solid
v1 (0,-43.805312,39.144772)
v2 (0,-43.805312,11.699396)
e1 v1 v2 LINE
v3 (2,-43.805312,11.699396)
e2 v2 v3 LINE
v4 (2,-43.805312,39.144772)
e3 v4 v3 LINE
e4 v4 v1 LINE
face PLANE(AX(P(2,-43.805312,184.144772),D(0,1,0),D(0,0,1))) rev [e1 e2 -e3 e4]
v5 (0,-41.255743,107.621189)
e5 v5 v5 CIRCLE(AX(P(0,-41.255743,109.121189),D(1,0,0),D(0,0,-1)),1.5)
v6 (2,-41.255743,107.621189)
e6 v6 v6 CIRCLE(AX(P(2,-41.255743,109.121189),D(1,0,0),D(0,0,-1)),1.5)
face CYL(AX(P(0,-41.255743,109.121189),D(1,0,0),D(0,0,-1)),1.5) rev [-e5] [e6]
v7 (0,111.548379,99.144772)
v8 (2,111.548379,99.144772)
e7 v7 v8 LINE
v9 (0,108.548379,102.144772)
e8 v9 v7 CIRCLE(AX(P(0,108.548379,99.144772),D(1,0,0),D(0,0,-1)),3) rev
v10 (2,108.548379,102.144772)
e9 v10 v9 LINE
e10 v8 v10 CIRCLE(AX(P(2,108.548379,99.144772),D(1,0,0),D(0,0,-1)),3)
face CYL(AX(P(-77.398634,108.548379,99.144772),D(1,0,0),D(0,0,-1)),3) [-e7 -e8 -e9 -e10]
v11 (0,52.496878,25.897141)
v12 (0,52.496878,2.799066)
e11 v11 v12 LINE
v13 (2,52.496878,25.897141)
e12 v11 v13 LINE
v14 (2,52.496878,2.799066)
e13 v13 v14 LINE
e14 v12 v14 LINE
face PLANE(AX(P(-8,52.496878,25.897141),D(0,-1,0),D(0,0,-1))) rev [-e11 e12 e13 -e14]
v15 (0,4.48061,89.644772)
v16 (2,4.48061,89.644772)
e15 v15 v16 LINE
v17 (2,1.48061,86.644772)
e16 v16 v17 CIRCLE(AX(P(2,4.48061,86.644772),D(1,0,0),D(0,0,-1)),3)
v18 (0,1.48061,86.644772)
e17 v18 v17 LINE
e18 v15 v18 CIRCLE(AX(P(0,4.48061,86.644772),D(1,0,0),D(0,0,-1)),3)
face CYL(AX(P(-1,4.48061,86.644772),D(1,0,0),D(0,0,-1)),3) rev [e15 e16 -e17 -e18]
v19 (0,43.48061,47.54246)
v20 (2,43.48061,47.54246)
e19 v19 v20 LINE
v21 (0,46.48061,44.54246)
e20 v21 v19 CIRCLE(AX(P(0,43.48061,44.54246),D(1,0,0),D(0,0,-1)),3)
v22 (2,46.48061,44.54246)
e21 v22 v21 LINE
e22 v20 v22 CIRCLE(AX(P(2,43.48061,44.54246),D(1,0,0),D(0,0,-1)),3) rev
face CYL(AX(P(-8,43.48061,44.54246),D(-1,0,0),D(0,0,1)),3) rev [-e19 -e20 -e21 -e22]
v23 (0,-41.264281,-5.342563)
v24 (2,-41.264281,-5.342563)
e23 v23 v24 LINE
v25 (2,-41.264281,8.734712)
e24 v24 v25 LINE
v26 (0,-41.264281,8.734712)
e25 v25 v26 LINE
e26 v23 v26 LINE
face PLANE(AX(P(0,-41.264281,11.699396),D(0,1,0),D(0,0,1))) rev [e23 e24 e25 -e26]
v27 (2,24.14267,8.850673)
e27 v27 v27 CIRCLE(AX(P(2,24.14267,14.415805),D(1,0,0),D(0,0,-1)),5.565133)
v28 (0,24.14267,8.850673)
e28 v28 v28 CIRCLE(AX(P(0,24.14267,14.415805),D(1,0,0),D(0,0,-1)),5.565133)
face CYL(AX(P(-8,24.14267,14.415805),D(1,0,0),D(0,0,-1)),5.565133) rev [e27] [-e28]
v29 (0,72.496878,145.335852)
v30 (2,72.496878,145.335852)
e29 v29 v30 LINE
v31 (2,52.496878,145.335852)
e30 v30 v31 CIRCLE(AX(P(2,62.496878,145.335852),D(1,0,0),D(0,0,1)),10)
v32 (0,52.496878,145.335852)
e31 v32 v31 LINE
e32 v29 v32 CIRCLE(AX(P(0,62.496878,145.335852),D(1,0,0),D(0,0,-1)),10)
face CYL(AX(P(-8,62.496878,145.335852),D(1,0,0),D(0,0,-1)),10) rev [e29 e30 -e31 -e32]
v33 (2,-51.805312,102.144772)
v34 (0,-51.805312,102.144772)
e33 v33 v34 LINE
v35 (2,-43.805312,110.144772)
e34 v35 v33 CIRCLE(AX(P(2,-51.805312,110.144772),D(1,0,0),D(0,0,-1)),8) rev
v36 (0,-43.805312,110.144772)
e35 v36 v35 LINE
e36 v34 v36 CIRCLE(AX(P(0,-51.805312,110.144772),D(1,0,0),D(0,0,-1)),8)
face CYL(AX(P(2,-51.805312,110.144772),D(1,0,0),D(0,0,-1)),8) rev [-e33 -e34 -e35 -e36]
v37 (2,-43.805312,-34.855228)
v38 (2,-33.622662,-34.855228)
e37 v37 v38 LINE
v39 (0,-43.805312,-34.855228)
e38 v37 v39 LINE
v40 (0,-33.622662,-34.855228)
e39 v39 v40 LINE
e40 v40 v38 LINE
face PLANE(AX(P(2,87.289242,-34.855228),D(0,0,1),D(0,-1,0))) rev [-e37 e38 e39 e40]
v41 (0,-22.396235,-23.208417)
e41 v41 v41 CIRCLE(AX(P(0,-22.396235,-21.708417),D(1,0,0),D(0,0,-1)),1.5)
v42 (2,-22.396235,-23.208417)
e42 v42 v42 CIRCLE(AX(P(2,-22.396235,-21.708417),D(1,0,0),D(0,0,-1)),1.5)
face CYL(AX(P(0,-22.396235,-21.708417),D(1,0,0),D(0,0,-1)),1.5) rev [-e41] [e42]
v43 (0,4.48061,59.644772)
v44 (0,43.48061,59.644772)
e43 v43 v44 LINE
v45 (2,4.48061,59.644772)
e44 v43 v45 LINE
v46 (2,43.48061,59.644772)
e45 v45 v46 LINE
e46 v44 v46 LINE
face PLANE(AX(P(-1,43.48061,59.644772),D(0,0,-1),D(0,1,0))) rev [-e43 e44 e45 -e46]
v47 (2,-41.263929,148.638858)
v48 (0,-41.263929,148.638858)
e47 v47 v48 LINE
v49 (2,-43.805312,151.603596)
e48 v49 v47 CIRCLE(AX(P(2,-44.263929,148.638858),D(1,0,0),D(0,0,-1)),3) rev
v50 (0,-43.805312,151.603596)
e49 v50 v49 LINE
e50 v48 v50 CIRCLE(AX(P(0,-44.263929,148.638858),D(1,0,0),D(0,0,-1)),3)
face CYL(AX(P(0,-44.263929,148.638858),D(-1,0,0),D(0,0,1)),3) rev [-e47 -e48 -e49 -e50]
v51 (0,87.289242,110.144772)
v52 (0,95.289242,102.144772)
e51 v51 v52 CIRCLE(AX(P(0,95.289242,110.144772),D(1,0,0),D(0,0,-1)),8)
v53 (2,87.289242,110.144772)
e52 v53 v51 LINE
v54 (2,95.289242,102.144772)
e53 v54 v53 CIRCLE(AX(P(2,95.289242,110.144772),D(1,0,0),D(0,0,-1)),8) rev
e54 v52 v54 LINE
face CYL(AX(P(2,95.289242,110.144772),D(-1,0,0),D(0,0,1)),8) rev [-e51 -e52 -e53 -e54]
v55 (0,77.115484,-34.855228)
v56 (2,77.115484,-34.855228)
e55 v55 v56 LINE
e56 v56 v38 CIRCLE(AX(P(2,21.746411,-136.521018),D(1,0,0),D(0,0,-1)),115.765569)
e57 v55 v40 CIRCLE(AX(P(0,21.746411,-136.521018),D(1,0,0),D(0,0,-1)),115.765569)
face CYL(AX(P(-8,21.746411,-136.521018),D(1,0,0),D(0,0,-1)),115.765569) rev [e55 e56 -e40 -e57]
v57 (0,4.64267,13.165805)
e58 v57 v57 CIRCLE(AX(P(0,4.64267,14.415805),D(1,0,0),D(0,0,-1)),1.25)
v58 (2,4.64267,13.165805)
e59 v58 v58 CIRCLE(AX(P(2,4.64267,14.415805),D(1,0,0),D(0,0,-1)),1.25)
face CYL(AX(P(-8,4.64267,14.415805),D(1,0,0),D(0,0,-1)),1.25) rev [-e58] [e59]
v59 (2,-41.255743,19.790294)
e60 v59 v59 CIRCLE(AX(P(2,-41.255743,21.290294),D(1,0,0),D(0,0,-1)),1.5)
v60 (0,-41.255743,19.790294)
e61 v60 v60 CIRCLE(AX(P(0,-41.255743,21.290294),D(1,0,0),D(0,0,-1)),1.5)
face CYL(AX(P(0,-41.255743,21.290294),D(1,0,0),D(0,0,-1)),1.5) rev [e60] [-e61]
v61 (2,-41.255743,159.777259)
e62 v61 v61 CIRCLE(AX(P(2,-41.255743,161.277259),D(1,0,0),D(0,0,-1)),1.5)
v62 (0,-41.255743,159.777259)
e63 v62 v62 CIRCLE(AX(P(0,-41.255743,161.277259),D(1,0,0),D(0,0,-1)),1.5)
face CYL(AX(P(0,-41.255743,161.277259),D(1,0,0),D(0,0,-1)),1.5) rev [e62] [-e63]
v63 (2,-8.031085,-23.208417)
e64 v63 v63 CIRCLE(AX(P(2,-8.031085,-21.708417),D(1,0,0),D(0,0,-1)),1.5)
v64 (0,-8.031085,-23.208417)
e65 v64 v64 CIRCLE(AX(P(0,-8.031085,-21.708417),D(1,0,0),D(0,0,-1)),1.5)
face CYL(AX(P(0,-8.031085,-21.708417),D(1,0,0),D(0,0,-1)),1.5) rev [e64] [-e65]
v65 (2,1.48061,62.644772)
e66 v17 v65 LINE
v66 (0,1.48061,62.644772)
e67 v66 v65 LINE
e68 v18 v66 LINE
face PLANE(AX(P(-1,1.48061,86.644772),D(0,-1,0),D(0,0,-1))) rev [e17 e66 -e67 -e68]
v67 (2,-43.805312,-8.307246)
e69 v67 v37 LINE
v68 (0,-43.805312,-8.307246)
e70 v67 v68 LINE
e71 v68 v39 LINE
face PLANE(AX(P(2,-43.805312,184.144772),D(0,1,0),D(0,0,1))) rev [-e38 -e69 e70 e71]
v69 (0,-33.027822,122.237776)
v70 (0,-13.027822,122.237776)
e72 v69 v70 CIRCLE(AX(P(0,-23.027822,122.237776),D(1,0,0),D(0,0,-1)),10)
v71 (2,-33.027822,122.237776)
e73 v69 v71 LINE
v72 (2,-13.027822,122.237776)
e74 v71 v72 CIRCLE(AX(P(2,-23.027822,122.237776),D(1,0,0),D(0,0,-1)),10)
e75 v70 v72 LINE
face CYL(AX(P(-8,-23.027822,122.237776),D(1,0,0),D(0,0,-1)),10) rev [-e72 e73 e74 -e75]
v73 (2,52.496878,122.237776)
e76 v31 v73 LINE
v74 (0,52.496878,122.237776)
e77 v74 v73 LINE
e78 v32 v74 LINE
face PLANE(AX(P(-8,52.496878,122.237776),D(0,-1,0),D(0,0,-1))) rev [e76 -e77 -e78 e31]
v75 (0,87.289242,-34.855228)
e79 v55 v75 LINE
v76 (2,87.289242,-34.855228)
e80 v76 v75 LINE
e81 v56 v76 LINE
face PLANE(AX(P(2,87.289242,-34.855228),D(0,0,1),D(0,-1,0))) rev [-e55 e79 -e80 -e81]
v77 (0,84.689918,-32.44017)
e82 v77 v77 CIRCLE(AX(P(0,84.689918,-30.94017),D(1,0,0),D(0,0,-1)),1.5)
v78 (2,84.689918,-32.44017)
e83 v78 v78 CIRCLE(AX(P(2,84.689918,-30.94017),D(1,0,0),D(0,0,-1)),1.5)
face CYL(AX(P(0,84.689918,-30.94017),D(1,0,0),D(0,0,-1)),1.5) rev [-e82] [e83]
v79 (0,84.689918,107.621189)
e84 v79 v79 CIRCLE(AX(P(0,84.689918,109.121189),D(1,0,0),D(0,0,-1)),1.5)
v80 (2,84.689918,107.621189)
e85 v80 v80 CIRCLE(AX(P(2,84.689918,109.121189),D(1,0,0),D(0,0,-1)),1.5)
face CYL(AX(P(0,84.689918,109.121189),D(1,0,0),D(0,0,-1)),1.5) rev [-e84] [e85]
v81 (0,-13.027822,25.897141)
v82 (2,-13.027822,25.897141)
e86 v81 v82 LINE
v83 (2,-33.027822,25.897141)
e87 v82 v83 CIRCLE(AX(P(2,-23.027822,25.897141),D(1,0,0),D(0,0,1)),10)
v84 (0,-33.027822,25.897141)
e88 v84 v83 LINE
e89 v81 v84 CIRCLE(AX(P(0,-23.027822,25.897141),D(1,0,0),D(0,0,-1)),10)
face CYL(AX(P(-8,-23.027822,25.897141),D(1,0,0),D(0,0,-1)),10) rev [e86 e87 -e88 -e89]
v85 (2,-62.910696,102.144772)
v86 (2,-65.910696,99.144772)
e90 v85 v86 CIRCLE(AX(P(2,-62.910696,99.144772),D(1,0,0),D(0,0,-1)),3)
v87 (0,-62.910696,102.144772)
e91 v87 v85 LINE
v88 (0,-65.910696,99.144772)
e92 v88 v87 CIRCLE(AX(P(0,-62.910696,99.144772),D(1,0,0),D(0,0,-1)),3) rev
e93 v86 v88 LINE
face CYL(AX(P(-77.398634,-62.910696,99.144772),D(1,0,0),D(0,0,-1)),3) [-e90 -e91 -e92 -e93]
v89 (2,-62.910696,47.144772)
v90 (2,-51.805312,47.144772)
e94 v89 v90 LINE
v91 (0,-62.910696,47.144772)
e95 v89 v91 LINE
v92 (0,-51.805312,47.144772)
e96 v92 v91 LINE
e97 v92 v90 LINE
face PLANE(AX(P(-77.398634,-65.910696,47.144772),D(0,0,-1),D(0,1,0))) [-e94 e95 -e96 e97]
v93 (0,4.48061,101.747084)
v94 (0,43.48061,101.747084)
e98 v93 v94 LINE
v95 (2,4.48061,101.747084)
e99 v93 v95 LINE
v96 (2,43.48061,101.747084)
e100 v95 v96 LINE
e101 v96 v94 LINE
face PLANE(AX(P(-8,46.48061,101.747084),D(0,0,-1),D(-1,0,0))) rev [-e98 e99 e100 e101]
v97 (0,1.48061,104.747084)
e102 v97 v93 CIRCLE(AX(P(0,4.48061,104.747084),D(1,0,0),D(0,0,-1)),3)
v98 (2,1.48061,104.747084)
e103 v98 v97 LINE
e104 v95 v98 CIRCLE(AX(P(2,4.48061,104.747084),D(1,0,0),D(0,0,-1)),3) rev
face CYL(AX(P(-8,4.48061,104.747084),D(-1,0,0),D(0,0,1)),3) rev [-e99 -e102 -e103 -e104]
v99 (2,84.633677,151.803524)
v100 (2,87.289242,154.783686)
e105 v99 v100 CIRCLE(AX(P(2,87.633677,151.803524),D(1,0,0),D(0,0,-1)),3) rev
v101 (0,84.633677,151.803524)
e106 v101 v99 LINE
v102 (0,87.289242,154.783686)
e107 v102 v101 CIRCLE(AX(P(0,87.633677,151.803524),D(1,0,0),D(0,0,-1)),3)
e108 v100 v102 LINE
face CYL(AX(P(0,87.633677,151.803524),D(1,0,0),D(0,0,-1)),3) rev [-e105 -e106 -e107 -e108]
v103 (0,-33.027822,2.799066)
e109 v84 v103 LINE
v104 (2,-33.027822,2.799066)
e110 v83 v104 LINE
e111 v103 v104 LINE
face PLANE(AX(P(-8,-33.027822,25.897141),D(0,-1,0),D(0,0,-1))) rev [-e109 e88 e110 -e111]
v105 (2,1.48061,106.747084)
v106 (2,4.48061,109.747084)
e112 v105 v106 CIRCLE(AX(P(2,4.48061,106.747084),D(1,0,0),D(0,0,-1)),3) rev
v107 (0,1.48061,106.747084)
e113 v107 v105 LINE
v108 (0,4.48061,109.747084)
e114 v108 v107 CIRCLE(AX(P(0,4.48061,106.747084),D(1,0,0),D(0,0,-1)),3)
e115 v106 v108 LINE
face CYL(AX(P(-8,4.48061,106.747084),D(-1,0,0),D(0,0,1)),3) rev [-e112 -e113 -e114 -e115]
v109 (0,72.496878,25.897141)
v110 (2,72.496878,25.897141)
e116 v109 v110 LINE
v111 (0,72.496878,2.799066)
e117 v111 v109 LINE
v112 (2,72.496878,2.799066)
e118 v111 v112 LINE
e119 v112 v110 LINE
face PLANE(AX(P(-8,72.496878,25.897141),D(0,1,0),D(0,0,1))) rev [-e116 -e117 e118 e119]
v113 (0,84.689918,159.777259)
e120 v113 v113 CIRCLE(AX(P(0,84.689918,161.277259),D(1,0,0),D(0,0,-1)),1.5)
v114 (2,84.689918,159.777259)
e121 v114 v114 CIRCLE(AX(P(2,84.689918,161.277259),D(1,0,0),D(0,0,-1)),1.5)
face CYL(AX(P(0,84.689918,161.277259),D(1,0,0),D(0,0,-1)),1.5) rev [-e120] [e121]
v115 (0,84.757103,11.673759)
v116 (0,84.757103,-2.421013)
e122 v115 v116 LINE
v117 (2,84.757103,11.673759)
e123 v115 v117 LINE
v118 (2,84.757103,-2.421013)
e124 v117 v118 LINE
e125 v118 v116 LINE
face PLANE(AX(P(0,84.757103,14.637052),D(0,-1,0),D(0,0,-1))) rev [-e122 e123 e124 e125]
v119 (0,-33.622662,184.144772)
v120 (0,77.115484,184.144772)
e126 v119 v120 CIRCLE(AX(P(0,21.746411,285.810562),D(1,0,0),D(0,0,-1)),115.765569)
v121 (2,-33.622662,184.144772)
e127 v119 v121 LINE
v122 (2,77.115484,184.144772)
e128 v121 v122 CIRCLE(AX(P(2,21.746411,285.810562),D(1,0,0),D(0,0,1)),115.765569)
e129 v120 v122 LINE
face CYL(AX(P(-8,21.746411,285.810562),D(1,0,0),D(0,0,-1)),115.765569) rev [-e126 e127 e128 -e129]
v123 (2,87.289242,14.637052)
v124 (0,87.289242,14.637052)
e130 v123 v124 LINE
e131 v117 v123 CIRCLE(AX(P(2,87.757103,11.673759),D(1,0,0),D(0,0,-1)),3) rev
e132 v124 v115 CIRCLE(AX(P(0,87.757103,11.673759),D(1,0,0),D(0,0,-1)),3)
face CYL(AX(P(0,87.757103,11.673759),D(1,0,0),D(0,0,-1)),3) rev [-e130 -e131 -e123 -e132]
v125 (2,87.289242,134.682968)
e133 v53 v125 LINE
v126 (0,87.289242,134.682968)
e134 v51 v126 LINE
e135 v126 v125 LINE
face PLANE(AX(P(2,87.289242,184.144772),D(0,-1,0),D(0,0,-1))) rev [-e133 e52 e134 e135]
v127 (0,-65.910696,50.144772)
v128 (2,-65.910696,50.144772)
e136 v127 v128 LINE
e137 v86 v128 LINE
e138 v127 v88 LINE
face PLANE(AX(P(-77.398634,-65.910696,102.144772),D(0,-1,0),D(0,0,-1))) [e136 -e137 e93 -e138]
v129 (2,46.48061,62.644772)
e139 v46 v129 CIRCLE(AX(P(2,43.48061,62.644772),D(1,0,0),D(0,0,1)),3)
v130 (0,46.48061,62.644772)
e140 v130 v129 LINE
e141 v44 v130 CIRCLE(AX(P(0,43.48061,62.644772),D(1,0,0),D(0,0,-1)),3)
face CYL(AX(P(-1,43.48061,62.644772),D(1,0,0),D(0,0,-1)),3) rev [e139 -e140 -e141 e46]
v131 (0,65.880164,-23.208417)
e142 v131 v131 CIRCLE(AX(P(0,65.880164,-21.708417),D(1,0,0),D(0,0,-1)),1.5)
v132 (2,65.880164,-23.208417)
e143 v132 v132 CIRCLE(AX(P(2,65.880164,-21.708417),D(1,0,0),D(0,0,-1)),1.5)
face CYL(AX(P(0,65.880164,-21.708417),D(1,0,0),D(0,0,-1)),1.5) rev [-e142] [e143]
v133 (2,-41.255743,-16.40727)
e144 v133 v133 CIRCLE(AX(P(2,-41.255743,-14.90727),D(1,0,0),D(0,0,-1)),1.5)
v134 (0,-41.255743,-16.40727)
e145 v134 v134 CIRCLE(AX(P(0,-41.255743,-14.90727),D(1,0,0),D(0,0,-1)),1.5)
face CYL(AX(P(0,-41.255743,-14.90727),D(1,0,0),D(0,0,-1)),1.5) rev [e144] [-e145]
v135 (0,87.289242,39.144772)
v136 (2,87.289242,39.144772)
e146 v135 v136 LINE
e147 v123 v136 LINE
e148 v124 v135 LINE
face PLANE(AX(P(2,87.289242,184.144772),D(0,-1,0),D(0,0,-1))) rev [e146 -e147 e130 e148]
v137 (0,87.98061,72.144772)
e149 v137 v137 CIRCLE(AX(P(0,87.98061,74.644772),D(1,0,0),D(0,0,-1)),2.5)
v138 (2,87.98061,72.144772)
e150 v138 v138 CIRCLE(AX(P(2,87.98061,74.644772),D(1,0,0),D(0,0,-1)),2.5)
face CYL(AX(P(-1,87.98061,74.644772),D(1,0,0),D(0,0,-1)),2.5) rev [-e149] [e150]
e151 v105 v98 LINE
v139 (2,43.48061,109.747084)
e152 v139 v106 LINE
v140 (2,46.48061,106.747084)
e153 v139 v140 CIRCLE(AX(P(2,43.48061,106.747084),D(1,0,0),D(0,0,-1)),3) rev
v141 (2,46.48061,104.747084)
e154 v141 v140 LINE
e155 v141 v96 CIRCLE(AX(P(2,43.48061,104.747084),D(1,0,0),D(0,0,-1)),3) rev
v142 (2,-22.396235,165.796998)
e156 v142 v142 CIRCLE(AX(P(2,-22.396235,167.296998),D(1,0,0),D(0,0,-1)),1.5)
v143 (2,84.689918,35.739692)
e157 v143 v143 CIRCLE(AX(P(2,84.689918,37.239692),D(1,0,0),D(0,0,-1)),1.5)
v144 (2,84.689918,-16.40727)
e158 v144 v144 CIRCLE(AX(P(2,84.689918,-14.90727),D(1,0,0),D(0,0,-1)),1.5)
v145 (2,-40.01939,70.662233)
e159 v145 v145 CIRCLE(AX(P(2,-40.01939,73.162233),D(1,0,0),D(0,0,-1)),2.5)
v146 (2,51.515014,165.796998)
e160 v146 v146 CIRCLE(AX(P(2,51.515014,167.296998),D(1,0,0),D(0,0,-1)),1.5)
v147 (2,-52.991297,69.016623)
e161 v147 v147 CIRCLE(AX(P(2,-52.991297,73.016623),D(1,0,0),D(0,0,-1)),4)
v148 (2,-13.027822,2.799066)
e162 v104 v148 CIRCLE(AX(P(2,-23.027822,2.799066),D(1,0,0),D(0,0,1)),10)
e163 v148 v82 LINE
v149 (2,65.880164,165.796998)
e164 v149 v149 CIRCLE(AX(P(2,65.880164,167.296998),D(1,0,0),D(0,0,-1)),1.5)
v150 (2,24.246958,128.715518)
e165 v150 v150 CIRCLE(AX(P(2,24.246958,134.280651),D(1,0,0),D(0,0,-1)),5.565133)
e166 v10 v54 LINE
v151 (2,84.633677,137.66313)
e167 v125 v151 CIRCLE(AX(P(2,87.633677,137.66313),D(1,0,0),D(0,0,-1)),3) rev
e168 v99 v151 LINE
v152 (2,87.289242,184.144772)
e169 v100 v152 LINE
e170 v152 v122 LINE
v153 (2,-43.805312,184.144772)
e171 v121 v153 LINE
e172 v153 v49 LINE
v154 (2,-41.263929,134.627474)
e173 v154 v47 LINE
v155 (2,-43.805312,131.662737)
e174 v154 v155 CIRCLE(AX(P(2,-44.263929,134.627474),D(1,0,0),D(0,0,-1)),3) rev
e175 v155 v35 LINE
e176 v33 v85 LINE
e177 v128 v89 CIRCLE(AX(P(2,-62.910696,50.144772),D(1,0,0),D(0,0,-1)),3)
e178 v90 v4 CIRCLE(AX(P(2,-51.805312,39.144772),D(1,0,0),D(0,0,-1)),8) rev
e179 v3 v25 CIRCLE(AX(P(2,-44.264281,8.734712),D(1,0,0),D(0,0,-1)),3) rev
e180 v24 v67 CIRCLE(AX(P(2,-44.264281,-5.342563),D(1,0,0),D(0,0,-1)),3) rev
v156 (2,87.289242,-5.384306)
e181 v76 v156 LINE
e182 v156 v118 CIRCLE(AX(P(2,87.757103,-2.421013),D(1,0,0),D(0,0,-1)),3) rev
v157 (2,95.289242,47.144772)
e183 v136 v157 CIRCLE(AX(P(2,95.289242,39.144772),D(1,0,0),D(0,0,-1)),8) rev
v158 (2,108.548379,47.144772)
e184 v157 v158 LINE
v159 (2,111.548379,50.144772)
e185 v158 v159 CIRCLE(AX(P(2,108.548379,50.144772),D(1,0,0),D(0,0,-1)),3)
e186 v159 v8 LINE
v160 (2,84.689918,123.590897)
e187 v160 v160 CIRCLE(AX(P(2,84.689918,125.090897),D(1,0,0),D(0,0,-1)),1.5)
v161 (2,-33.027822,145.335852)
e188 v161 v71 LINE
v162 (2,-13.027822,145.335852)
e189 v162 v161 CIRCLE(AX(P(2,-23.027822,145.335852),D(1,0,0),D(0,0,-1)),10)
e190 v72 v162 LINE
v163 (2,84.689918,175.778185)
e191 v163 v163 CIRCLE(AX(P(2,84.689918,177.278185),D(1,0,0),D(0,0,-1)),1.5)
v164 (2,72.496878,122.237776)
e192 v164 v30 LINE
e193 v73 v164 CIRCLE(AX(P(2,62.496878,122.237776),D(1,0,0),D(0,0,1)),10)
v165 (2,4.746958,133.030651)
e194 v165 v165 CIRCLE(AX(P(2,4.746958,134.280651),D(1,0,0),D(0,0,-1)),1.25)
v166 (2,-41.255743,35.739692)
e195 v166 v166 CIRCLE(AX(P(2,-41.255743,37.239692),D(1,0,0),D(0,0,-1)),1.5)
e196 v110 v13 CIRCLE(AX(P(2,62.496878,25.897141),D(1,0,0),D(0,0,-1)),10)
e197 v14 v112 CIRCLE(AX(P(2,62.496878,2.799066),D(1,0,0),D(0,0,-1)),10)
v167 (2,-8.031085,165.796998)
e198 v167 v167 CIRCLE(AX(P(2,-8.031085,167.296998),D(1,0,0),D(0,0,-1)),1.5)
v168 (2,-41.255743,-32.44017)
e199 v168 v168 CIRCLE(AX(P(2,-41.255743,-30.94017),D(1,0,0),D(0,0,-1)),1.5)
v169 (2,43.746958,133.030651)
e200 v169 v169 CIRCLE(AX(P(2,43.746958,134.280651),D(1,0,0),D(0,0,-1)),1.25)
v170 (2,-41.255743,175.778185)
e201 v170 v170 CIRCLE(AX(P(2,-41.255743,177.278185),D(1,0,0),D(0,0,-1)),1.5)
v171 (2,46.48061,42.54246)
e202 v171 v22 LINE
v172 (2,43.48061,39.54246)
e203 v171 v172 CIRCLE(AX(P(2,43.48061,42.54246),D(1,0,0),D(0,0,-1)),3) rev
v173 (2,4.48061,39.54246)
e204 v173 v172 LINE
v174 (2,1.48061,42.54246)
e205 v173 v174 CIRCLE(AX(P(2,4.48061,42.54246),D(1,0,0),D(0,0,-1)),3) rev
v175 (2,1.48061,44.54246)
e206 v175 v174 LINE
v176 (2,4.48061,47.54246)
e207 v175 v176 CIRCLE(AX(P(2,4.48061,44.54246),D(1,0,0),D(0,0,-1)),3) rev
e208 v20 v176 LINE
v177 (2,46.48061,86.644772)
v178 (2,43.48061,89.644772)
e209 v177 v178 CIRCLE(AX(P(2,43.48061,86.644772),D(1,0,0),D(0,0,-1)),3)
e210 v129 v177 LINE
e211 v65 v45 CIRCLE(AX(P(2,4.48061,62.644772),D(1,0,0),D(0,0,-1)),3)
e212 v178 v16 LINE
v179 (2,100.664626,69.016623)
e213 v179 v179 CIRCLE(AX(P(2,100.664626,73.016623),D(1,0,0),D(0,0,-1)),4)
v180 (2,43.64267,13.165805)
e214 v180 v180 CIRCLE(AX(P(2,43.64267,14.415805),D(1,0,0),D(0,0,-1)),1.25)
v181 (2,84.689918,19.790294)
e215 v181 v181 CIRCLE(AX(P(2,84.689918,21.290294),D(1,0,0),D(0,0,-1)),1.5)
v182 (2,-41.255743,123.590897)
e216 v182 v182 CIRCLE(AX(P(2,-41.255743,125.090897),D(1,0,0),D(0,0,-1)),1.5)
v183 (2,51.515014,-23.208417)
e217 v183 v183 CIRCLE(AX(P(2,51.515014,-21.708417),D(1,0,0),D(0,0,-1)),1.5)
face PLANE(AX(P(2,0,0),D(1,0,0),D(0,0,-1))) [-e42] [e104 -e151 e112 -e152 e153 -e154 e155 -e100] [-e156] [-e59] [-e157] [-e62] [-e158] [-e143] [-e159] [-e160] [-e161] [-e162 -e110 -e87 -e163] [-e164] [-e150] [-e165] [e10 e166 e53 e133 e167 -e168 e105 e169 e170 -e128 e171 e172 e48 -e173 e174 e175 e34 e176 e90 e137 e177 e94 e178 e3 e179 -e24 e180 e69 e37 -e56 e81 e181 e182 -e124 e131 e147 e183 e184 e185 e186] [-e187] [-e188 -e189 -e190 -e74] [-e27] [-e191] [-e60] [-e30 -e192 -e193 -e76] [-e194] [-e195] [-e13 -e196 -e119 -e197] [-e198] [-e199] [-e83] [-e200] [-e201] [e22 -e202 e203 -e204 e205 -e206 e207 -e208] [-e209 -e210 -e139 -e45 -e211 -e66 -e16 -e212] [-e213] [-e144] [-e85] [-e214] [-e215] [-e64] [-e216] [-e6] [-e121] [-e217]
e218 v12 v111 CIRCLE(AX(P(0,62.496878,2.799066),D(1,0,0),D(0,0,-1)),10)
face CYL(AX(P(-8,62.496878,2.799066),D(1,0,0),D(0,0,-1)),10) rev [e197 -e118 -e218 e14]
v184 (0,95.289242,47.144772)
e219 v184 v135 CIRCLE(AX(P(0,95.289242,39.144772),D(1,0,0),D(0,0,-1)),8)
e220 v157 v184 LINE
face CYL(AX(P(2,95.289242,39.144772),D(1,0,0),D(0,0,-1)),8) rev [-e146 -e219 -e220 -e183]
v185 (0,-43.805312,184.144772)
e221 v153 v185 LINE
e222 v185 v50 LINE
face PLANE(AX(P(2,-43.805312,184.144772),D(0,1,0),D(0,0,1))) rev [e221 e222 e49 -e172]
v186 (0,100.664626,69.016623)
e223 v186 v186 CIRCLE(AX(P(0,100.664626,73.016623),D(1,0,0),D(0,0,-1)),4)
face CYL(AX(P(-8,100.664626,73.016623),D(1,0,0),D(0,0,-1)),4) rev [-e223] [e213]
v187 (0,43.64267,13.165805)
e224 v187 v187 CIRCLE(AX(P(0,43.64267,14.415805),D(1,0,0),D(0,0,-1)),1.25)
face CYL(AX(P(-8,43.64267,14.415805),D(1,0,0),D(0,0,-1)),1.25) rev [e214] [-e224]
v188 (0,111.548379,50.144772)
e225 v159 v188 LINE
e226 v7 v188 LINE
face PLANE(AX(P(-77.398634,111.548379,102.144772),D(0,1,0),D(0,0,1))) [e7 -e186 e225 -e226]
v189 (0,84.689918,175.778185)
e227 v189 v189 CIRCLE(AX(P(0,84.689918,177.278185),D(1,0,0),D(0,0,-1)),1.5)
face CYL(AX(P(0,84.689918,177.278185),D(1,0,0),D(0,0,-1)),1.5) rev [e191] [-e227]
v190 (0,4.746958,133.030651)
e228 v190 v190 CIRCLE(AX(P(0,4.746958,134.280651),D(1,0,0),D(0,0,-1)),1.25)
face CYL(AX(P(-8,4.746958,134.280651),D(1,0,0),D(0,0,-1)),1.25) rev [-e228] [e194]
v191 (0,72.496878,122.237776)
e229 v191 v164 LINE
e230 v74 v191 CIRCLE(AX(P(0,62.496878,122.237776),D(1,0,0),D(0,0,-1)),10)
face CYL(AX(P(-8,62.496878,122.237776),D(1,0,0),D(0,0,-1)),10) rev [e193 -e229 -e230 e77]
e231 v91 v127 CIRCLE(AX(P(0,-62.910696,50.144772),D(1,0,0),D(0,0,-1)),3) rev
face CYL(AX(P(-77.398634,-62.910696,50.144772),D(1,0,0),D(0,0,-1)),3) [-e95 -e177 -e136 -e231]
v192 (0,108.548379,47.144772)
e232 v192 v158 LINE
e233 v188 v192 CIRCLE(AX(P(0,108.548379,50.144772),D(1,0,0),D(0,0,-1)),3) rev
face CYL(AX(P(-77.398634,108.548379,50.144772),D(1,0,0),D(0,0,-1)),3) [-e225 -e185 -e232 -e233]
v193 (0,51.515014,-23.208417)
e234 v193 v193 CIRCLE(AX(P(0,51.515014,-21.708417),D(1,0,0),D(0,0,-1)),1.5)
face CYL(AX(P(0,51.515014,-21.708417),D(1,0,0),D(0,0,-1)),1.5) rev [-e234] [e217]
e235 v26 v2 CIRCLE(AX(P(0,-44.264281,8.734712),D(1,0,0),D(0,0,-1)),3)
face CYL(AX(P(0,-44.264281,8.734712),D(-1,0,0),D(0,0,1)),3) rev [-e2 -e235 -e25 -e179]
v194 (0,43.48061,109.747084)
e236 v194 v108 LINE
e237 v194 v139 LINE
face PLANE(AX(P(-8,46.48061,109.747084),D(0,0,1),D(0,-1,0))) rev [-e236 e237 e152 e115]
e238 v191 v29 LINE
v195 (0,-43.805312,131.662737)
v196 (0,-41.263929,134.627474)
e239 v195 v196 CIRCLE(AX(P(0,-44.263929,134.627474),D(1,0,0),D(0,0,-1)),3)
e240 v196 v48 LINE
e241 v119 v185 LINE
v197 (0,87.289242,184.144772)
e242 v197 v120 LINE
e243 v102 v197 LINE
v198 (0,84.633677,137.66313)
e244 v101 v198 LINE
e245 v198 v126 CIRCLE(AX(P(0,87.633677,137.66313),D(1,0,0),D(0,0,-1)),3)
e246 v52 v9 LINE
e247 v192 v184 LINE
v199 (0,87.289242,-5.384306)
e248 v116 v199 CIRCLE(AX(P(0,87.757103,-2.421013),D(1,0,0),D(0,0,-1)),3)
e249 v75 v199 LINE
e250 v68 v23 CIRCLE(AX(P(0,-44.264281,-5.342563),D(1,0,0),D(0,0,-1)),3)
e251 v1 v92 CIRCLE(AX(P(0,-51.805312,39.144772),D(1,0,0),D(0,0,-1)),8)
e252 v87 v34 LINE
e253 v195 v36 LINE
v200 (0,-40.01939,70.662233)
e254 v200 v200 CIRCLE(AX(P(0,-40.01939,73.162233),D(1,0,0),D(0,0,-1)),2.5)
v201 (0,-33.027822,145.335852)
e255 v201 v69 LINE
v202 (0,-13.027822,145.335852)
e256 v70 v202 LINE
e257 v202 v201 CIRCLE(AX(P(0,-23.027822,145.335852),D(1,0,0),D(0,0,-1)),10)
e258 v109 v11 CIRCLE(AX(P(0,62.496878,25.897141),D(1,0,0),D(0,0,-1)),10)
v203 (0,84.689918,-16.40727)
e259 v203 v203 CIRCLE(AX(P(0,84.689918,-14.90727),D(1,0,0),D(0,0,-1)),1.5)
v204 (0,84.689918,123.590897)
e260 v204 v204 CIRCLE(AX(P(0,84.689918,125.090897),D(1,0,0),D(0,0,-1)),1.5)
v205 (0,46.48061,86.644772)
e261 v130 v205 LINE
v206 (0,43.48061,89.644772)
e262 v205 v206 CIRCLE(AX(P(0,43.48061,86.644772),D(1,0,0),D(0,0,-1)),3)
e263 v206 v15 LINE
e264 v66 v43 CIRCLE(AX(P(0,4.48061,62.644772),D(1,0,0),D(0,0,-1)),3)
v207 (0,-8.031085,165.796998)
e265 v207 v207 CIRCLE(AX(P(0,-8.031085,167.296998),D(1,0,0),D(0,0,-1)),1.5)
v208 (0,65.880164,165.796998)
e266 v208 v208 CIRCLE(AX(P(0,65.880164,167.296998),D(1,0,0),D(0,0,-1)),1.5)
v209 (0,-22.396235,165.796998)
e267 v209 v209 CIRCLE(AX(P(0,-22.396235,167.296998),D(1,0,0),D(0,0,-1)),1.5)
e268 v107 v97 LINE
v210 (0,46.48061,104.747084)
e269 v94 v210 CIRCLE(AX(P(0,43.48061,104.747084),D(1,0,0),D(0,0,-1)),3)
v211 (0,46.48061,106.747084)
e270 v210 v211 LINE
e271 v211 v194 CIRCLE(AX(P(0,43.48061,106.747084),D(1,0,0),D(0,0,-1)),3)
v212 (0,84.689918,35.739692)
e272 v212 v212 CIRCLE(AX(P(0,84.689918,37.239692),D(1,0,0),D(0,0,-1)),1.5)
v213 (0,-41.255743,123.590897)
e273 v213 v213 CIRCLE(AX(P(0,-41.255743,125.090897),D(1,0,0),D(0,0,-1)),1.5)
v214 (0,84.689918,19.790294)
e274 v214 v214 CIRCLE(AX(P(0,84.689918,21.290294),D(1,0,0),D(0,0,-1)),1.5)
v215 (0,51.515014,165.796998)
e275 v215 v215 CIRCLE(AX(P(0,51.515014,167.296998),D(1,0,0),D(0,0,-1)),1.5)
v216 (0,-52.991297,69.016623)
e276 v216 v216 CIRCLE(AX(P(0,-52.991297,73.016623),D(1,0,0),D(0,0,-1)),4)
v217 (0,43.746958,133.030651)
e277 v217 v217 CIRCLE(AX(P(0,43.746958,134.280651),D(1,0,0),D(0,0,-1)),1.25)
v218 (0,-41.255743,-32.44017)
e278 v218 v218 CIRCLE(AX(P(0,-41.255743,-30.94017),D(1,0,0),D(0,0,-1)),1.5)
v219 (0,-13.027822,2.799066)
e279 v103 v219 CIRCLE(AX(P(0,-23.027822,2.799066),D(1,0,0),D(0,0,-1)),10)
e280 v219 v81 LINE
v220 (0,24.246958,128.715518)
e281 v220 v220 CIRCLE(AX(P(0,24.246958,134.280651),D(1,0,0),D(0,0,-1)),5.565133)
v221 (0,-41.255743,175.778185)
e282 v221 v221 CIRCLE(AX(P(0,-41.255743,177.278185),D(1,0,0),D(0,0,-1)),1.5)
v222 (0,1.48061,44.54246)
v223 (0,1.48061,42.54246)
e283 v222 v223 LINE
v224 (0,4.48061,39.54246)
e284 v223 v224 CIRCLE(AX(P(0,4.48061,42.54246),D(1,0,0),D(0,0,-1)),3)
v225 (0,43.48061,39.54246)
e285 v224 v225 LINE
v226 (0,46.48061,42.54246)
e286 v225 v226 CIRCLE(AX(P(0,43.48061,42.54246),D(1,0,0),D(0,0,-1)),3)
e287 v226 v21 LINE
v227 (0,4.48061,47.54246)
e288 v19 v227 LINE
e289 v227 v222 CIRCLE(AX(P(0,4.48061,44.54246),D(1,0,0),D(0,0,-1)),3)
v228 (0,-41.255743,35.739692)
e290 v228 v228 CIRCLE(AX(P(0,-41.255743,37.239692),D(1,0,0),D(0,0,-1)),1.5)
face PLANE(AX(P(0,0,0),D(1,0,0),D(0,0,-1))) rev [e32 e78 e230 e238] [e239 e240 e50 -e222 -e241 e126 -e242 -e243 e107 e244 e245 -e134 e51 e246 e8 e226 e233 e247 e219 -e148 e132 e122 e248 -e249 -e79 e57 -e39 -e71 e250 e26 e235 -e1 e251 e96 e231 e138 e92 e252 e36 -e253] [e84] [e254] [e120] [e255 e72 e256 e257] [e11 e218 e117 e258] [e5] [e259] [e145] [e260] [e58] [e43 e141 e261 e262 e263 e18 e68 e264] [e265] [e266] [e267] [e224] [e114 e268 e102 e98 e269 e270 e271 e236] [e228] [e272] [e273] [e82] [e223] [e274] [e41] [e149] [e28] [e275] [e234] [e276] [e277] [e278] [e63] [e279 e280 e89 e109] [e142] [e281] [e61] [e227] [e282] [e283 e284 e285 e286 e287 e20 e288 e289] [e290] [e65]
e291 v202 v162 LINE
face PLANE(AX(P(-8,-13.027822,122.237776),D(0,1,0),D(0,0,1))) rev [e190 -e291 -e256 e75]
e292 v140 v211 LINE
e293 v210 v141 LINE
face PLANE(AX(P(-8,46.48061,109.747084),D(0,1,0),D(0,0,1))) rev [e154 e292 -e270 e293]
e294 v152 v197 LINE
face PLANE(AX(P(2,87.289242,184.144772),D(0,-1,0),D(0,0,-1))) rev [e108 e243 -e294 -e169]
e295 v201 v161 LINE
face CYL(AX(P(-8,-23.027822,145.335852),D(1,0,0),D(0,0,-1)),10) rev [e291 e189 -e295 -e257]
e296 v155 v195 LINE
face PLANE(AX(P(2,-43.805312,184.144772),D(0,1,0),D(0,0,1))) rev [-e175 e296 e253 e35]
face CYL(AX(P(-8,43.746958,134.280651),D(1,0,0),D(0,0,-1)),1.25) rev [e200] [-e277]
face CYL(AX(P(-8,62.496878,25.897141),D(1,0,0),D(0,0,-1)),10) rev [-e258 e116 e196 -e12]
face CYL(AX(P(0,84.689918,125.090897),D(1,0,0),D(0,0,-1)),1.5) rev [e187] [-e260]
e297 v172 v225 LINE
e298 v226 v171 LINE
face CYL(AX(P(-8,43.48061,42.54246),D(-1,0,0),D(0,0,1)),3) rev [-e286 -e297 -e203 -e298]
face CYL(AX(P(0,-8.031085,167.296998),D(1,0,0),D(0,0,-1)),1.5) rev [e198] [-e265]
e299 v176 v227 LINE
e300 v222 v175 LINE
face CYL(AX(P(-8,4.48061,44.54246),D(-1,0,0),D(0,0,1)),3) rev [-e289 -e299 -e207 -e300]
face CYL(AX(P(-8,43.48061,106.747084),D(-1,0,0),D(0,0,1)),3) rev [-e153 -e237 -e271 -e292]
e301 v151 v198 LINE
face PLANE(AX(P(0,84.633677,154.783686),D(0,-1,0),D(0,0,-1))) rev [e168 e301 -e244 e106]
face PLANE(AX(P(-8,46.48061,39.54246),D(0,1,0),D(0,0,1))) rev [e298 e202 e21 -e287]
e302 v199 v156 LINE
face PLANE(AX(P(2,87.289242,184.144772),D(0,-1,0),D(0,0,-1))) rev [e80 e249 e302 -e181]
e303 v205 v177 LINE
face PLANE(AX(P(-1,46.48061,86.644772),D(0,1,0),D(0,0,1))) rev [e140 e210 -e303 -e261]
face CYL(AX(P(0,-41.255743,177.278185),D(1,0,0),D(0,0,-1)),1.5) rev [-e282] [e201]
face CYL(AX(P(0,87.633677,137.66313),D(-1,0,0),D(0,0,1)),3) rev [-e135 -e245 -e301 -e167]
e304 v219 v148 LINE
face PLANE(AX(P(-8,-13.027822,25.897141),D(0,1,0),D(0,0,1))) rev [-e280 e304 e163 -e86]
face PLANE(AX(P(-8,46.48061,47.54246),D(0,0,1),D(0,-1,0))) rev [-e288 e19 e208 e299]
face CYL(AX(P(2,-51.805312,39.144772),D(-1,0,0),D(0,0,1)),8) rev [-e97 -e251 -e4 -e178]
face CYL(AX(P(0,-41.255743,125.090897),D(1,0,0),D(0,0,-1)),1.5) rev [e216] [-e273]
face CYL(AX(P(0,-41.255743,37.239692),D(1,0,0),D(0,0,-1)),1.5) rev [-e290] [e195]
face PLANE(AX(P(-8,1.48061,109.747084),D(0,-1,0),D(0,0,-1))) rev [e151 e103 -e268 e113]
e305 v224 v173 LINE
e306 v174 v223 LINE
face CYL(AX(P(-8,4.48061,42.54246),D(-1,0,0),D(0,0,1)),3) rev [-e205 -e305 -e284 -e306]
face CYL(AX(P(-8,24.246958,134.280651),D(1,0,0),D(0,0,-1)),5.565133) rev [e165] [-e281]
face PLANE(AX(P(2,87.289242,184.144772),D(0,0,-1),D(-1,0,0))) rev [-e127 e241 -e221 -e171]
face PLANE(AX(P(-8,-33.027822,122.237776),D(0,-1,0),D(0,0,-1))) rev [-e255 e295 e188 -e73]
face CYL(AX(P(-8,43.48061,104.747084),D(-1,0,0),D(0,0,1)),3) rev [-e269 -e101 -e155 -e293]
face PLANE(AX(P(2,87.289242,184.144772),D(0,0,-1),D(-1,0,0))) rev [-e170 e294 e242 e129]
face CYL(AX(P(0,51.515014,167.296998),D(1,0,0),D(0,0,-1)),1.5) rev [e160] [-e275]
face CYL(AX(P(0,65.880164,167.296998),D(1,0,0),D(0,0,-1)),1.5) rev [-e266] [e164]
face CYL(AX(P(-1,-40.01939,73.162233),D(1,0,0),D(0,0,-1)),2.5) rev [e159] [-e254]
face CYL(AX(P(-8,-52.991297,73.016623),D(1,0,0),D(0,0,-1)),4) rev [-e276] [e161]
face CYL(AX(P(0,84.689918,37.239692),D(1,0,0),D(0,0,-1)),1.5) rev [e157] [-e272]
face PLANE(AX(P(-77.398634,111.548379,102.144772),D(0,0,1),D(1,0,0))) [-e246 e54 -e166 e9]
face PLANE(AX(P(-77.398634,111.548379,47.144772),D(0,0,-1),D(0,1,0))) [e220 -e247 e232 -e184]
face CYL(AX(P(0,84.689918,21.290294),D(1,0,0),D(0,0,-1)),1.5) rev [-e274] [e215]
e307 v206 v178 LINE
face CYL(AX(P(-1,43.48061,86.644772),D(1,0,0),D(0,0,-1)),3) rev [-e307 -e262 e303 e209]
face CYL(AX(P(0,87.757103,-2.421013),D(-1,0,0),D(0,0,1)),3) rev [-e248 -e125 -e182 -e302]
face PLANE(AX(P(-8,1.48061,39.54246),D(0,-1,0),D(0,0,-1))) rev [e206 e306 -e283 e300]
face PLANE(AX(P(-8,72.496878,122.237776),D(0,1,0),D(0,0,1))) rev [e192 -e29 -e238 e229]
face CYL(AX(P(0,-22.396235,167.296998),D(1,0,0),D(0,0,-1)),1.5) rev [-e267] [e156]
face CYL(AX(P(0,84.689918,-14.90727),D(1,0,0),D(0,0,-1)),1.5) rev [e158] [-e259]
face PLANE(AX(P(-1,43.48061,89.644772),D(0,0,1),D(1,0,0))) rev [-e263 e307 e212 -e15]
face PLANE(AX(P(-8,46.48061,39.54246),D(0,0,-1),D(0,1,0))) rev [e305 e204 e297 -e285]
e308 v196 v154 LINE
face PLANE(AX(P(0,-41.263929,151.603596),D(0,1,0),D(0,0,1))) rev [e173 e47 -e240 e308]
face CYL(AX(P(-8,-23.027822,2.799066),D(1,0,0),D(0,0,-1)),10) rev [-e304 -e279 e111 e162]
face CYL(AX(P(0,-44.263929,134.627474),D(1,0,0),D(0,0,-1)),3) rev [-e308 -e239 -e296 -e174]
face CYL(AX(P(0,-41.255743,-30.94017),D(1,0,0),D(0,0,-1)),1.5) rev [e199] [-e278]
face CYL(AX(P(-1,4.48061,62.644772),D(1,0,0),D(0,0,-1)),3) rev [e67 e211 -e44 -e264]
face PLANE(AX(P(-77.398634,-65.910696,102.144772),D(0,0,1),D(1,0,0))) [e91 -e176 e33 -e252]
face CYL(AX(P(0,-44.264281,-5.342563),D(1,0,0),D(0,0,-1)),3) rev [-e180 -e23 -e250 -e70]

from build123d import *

# Parameters (mm, degrees)
SKETCH1_W           = 219
SKETCH1_H           = 131.094554082
BOSS_EXTRUDE1_DEPTH = 2
SKETCH2_R           = 1.5
CUT_EXTRUDE1_DEPTH  = 2
SKETCH3_W           = 20.100718227
SKETCH3_H           = 5.311130235
SKETCH3_W_2         = 20.021358258
SKETCH3_H_2         = 5.064277487
SKETCH3_W_3         = 19.940859064
SKETCH3_H_3         = 5.08276585
SKETCH3_W_4         = 20.006641617
SKETCH3_H_4         = 5.082063379
CUT_EXTRUDE2_DEPTH  = 2
FILLET1_R           = 3
SKETCH4_R           = 1.5
CUT_EXTRUDE3_DEPTH  = 2
SKETCH5_R           = 1.25
SKETCH5_R_2         = 5.565132804
SKETCH5_W           = 8
SKETCH5_H           = 45
CUT_EXTRUDE4_DEPTH  = 10
SKETCH6_W           = 55
SKETCH6_H           = 54.456850543
BOSS_EXTRUDE2_DEPTH = 2
FILLET2_R           = 8
FILLET3_R           = 3
SKETCH7_R           = 4
CUT_EXTRUDE5_DEPTH  = 10
SKETCH8_R           = 2.5
CUT_EXTRUDE6_DEPTH  = 3
FILLET4_R           = 3


with BuildPart() as part:
    # Sketch1 → Boss-Extrude1 (new body)
    with BuildSketch(Plane(origin=(0, 0, 0), x_dir=(0, 0, -1), z_dir=(1, 0, 0))):
        with Locations((-74.644772092, 21.741964745)):
            Rectangle(SKETCH1_W, SKETCH1_H)
    extrude(amount=BOSS_EXTRUDE1_DEPTH)

    # Sketch2 → Cut-Extrude1 (cut)
    with BuildSketch(Plane(origin=(2, 0, 0), x_dir=(0, 0, -1), z_dir=(1, 0, 0))):
        with Locations((-177.27818527, 84.689917601)):
            Circle(SKETCH2_R)
        with Locations((-161.277258525, 84.689917601)):
            Circle(SKETCH2_R)
        with Locations((14.907270265, 84.689917601)):
            Circle(SKETCH2_R)
        with Locations((30.940170054, 84.689917601)):
            Circle(SKETCH2_R)
        with Locations((-125.090896887, 84.689917601)):
            Circle(SKETCH2_R)
        with Locations((-109.121189232, 84.689917601)):
            Circle(SKETCH2_R)
        with Locations((-37.23969182, 84.689917601)):
            Circle(SKETCH2_R)
        with Locations((-21.290294086, 84.689917601)):
            Circle(SKETCH2_R)
        with Locations((-177.27818527, -41.255743067)):
            Circle(SKETCH2_R)
        with Locations((-161.277258525, -41.255743067)):
            Circle(SKETCH2_R)
        with Locations((-125.090896887, -41.255743067)):
            Circle(SKETCH2_R)
        with Locations((-109.121189232, -41.255743067)):
            Circle(SKETCH2_R)
        with Locations((-21.290294086, -41.255743067)):
            Circle(SKETCH2_R)
        with Locations((-37.23969182, -41.255743067)):
            Circle(SKETCH2_R)
        with Locations((14.907270265, -41.255743067)):
            Circle(SKETCH2_R)
        with Locations((30.940170054, -41.255743067)):
            Circle(SKETCH2_R)
    extrude(amount=-CUT_EXTRUDE1_DEPTH, mode=Mode.SUBTRACT)

    # Sketch3 → Cut-Extrude2 (cut)
    with BuildSketch(Plane(origin=(2, 0, 0), x_dir=(0, 0, -1), z_dir=(1, 0, 0))):
        with Locations((-144.733326963, 87.289241785)):
            Rectangle(SKETCH3_W, SKETCH3_H)
        with Locations((-4.626373242, 87.289241786)):
            Rectangle(SKETCH3_W_2, SKETCH3_H_2)
        with Locations((-141.63316605, -43.805312296)):
            Rectangle(SKETCH3_W_3, SKETCH3_H_3)
        with Locations((-1.696074774, -43.805312296)):
            Rectangle(SKETCH3_W_4, SKETCH3_H_4)
    extrude(amount=-CUT_EXTRUDE2_DEPTH, mode=Mode.SUBTRACT)

    # Fillet1
    # the kernel refuses this fillet: 3 mm, written as the material it adds along each edge
    with BuildSketch(Plane(origin=(2, 84.633676668, 154.783686076), x_dir=(0, 1, 0), z_dir=(-1, 0, 0))) as fillet1_piece_1:
        with BuildLine():
            CenterArc((3, 2.980161843), FILLET1_R, 180, 83.407239863)
            Line((0, 2.980161843), (-0.06, 2.980161843))
            Line((-0.06, 2.980161843), (-0.06, 0))
            Line((-0.06, 0), (0, -0.06))
            ThreePointArc((0, -0.06), (1.327782559, -0.06), (2.64867642, -0.059603237))
            Line((2.64867642, -0.059603237), (2.655565117, 0))
        make_face()
    extrude(amount=2)
    with BuildSketch(Plane(origin=(2, 84.633676668, 134.682967849), x_dir=(0, 1, 0), z_dir=(-1, 0, 0))) as fillet1_piece_2:
        with BuildLine():
            CenterArc((3, -2.980161843), FILLET1_R, 96.592760137, 83.407239863)
            Line((0, -2.980161843), (-0.06, -2.980161843))
            Line((-0.06, -2.980161843), (-0.06, 0))
            Line((-0.06, 0), (0, 0.06))
            ThreePointArc((0, 0.06), (1.327782559, 0.06), (2.64867642, 0.059603237))
            Line((2.64867642, 0.059603237), (2.655565117, 0))
        make_face()
    extrude(amount=2)
    with BuildSketch(Plane(origin=(2, 84.757103042, -5.384305887), x_dir=(0, 1, 0), z_dir=(-1, 0, 0))) as fillet1_piece_3:
        with BuildLine():
            CenterArc((3, -2.963293074), FILLET1_R, 98.972114931, 81.027885069)
            Line((0, -2.963293074), (-0.06, -2.963293074))
            Line((-0.06, -2.963293074), (-0.06, 0))
            Line((-0.06, 0), (0, 0.06))
            ThreePointArc((0, 0.06), (1.266069372, 0.06), (2.522781518, 0.059265861))
            Line((2.522781518, 0.059265861), (2.532138743, 0))
        make_face()
    extrude(amount=2)
    with BuildSketch(Plane(origin=(2, 84.757103042, 14.637052371), x_dir=(0, 0, -1), z_dir=(-1, 0, 0))) as fillet1_piece_4:
        with BuildLine():
            CenterArc((2.963293074, -3), FILLET1_R, 90, 81.027885069)
            Line((0, -2.532138743), (-0.059265861, -2.522781518))
            ThreePointArc((-0.059265861, -2.522781518), (-0.06, -1.266069372), (-0.06, 0))
            Line((-0.06, 0), (0, 0.06))
            Line((0, 0.06), (2.963293074, 0.06))
            Line((2.963293074, 0.06), (2.963293074, 0))
        make_face()
    extrude(amount=2)
    with BuildSketch(Plane(origin=(2, -41.264280606, 11.699395582), x_dir=(0, -1, 0), z_dir=(-1, 0, 0))) as fillet1_piece_5:
        with BuildLine():
            CenterArc((3, -2.964683472), FILLET1_R, 98.800208751, 81.199791249)
            Line((0, -2.964683472), (-0.06, -2.964683472))
            Line((-0.06, -2.964683472), (-0.06, 0))
            Line((-0.06, 0), (0, 0.06))
            ThreePointArc((0, 0.06), (1.270515845, 0.06), (2.531852323, 0.059293669))
            Line((2.531852323, 0.059293669), (2.54103169, 0))
        make_face()
    extrude(amount=2)
    with BuildSketch(Plane(origin=(2, -41.264280606, -8.307246035), x_dir=(0, 0, 1), z_dir=(-1, 0, 0))) as fillet1_piece_6:
        with BuildLine():
            CenterArc((2.964683472, -3), FILLET1_R, 90, 81.199791249)
            Line((0, -2.54103169), (-0.059293669, -2.531852323))
            ThreePointArc((-0.059293669, -2.531852323), (-0.06, -1.270515845), (-0.06, 0))
            Line((-0.06, 0), (0, 0.06))
            Line((0, 0.06), (2.964683472, 0.06))
            Line((2.964683472, 0.06), (2.964683472, 0))
        make_face()
    extrude(amount=2)
    with BuildSketch(Plane(origin=(2, -41.263929371, 131.662736518), x_dir=(0, 0, 1), z_dir=(-1, 0, 0))) as fillet1_piece_7:
        with BuildLine():
            CenterArc((2.964737826, -3), FILLET1_R, 90, 81.206579194)
            Line((0, -2.541382925), (-0.059294757, -2.532210583))
            ThreePointArc((-0.059294757, -2.532210583), (-0.06, -1.270691462), (-0.06, 0))
            Line((-0.06, 0), (0, 0.06))
            Line((0, 0.06), (2.964737826, 0.06))
            Line((2.964737826, 0.06), (2.964737826, 0))
        make_face()
    extrude(amount=2)
    with BuildSketch(Plane(origin=(2, -41.263929371, 151.603595582), x_dir=(0, -1, 0), z_dir=(-1, 0, 0))) as fillet1_piece_8:
        with BuildLine():
            CenterArc((3, -2.964737826), FILLET1_R, 98.793420806, 81.206579194)
            Line((0, -2.964737826), (-0.06, -2.964737826))
            Line((-0.06, -2.964737826), (-0.06, 0))
            Line((-0.06, 0), (0, 0.06))
            ThreePointArc((0, 0.06), (1.270691462, 0.06), (2.532210583, 0.059294757))
            Line((2.532210583, 0.059294757), (2.541382925, 0))
        make_face()
    extrude(amount=2)

    # Sketch4 → Cut-Extrude3 (cut)
    with BuildSketch(Plane(origin=(2, 0, 0), x_dir=(0, 0, -1), z_dir=(1, 0, 0))):
        with Locations((-167.296997749, 65.880164244)):
            Circle(SKETCH4_R)
        with Locations((-167.296997749, 51.515014112)):
            Circle(SKETCH4_R)
        with Locations((-167.296997749, -8.031084623)):
            Circle(SKETCH4_R)
        with Locations((-167.296997749, -22.396234754)):
            Circle(SKETCH4_R)
        with Locations((21.708416743, 65.880164244)):
            Circle(SKETCH4_R)
        with Locations((21.708416743, 51.515014112)):
            Circle(SKETCH4_R)
        with Locations((21.708416743, -8.031084623)):
            Circle(SKETCH4_R)
        with Locations((21.708416743, -22.396234754)):
            Circle(SKETCH4_R)
    extrude(amount=-CUT_EXTRUDE3_DEPTH, mode=Mode.SUBTRACT)

    # Sketch5 → Cut-Extrude4 (cut)
    with BuildSketch(Plane(origin=(2, 0, 0), x_dir=(0, 0, -1), z_dir=(1, 0, 0))):
        with Locations((-74.644772092, 42.276641696)):
            Circle(SKETCH5_R)
        with Locations((-74.644772092, 5.684578533)):
            Circle(SKETCH5_R)
        with Locations((-74.644772092, 23.980610114)):
            Circle(SKETCH5_R_2)
        with Locations((-14.415805331, 43.642669798)):
            Circle(SKETCH5_R)
        with Locations((-14.415805331, 4.642669798)):
            Circle(SKETCH5_R)
        with Locations((-14.415805331, 24.142669798)):
            Circle(SKETCH5_R_2)
        with Locations((-134.280651117, 43.746958038)):
            Circle(SKETCH5_R)
        with Locations((-134.280651117, 4.746958038)):
            Circle(SKETCH5_R)
        with Locations((-134.280651117, 24.246958038)):
            Circle(SKETCH5_R_2)
        with BuildLine():
            Line((-184.144772092, 77.115484366), (-184.144772092, -33.62266193))
            ThreePointArc((-184.144772092, -33.62266193), (-170.044992415, 21.746411218), (-184.144772092, 77.115484366))
        make_face()
        with BuildLine():
            Line((34.855227908, 77.115484366), (34.855227908, -33.62266193))
            ThreePointArc((34.855227908, -33.62266193), (20.755448231, 21.746411218), (34.855227908, 77.115484366))
        make_face()
        with BuildLine():
            Line((-25.897141257, 72.496877719), (-2.799065676, 72.496877719))
            ThreePointArc((-2.799065676, 72.496877719), (7.200934324, 62.496877719), (-2.799065676, 52.496877719))
            Line((-2.799065676, 52.496877719), (-25.897141257, 52.496877719))
            ThreePointArc((-25.897141257, 52.496877719), (-35.897141257, 62.496877719), (-25.897141257, 72.496877719))
        make_face()
        with BuildLine():
            Line((-25.897141257, -33.027821748), (-2.799065676, -33.027821748))
            ThreePointArc((-2.799065676, -33.027821748), (7.200934324, -23.027821748), (-2.799065676, -13.027821748))
            Line((-2.799065676, -13.027821748), (-25.897141257, -13.027821748))
            ThreePointArc((-25.897141257, -13.027821748), (-35.897141257, -23.027821748), (-25.897141257, -33.027821748))
        make_face()
        with BuildLine():
            Line((-122.237776037, 72.496877719), (-145.335851618, 72.496877719))
            ThreePointArc((-145.335851618, 72.496877719), (-155.335851618, 62.496877719), (-145.335851618, 52.496877719))
            Line((-145.335851618, 52.496877719), (-122.237776037, 52.496877719))
            ThreePointArc((-122.237776037, 52.496877719), (-112.237776037, 62.496877719), (-122.237776037, 72.496877719))
        make_face()
        with BuildLine():
            Line((-122.237776037, -33.027821748), (-145.335851618, -33.027821748))
            ThreePointArc((-145.335851618, -33.027821748), (-155.335851618, -23.027821748), (-145.335851618, -13.027821748))
            Line((-145.335851618, -13.027821748), (-122.237776037, -13.027821748))
            ThreePointArc((-122.237776037, -13.027821748), (-112.237776037, -23.027821748), (-122.237776037, -33.027821748))
        make_face()
        with Locations((-105.747084182, 23.980610114)):
            Rectangle(SKETCH5_W, SKETCH5_H)
        with Locations((-43.542460001, 23.980610114)):
            Rectangle(SKETCH5_W, SKETCH5_H)
    extrude(amount=-CUT_EXTRUDE4_DEPTH, mode=Mode.SUBTRACT)

    # Sketch6 → Boss-Extrude2 (add)
    with BuildSketch(Plane(origin=(2, 0, 0), x_dir=(0, 0, -1), z_dir=(1, 0, 0))):
        with Locations((-74.644772092, 84.319953677)):
            Rectangle(SKETCH6_W, SKETCH6_H)
        with Locations((-74.644772092, -38.682270845)):
            Rectangle(SKETCH6_W, SKETCH6_H)
    extrude(amount=-BOSS_EXTRUDE2_DEPTH)

    # Fillet2
    fillet2_edges = [part.edges().sort_by_distance(p)[0] for p in [
        (1, 87.289241786, 47.144772092),
        (1, 87.289241786, 102.144772092),
        (1, -43.805312296, 102.144772092),
        (1, -43.805312296, 47.144772092),
    ]]
    fillet(fillet2_edges, radius=FILLET2_R)

    # Fillet3
    fillet3_edges = [part.edges().sort_by_distance(p)[0] for p in [
        (1, 111.548378948, 47.144772092),
        (1, 111.548378948, 102.144772092),
        (1, -65.910696116, 102.144772092),
        (1, -65.910696116, 47.144772092),
    ]]
    fillet(fillet3_edges, radius=FILLET3_R)

    # Sketch7 → Cut-Extrude5 (cut)
    with BuildSketch(Plane(origin=(2, 0, 0), x_dir=(0, 0, -1), z_dir=(1, 0, 0))):
        with Locations((-73.016623219, 100.664626398)):
            Circle(SKETCH7_R)
        with Locations((-73.016623219, -52.991297145)):
            Circle(SKETCH7_R)
    extrude(amount=-CUT_EXTRUDE5_DEPTH, mode=Mode.SUBTRACT)

    # Sketch8 → Cut-Extrude6 (cut)
    with BuildSketch(Plane(origin=(2, 0, 0), x_dir=(0, 0, -1), z_dir=(1, 0, 0))):
        with Locations((-74.644772092, 87.980610114)):
            Circle(SKETCH8_R)
        with Locations((-73.162232803, -40.019389886)):
            Circle(SKETCH8_R)
        with BuildLine():
            Line((-86.644772092, 46.480610114), (-62.644772092, 46.480610114))
            ThreePointArc((-62.644772092, 46.480610114), (-60.523451748, 45.601930458), (-59.644772092, 43.480610114))
            Line((-59.644772092, 43.480610114), (-59.644772092, 4.480610114))
            ThreePointArc((-59.644772092, 4.480610114), (-60.523451748, 2.359289771), (-62.644772092, 1.480610114))
            Line((-62.644772092, 1.480610114), (-86.644772092, 1.480610114))
            ThreePointArc((-86.644772092, 1.480610114), (-88.766092435, 2.359289771), (-89.644772092, 4.480610114))
            Line((-89.644772092, 4.480610114), (-89.644772092, 43.480610114))
            ThreePointArc((-89.644772092, 43.480610114), (-88.766092435, 45.601930458), (-86.644772092, 46.480610114))
        make_face()
    extrude(amount=-CUT_EXTRUDE6_DEPTH, mode=Mode.SUBTRACT)

    # Fillet4
    fillet4_edges = [part.edges().sort_by_distance(p)[0] for p in [
        (1, 46.480610114, 101.747084182),
        (1, 1.480610114, 101.747084182),
        (1, 1.480610114, 109.747084182),
        (1, 46.480610114, 109.747084182),
        (1, 1.480610114, 47.542460001),
        (1, 46.480610114, 47.542460001),
        (1, 46.480610114, 39.542460001),
        (1, 1.480610114, 39.542460001),
    ]]
    fillet(fillet4_edges, radius=FILLET4_R)


solid = part.part
